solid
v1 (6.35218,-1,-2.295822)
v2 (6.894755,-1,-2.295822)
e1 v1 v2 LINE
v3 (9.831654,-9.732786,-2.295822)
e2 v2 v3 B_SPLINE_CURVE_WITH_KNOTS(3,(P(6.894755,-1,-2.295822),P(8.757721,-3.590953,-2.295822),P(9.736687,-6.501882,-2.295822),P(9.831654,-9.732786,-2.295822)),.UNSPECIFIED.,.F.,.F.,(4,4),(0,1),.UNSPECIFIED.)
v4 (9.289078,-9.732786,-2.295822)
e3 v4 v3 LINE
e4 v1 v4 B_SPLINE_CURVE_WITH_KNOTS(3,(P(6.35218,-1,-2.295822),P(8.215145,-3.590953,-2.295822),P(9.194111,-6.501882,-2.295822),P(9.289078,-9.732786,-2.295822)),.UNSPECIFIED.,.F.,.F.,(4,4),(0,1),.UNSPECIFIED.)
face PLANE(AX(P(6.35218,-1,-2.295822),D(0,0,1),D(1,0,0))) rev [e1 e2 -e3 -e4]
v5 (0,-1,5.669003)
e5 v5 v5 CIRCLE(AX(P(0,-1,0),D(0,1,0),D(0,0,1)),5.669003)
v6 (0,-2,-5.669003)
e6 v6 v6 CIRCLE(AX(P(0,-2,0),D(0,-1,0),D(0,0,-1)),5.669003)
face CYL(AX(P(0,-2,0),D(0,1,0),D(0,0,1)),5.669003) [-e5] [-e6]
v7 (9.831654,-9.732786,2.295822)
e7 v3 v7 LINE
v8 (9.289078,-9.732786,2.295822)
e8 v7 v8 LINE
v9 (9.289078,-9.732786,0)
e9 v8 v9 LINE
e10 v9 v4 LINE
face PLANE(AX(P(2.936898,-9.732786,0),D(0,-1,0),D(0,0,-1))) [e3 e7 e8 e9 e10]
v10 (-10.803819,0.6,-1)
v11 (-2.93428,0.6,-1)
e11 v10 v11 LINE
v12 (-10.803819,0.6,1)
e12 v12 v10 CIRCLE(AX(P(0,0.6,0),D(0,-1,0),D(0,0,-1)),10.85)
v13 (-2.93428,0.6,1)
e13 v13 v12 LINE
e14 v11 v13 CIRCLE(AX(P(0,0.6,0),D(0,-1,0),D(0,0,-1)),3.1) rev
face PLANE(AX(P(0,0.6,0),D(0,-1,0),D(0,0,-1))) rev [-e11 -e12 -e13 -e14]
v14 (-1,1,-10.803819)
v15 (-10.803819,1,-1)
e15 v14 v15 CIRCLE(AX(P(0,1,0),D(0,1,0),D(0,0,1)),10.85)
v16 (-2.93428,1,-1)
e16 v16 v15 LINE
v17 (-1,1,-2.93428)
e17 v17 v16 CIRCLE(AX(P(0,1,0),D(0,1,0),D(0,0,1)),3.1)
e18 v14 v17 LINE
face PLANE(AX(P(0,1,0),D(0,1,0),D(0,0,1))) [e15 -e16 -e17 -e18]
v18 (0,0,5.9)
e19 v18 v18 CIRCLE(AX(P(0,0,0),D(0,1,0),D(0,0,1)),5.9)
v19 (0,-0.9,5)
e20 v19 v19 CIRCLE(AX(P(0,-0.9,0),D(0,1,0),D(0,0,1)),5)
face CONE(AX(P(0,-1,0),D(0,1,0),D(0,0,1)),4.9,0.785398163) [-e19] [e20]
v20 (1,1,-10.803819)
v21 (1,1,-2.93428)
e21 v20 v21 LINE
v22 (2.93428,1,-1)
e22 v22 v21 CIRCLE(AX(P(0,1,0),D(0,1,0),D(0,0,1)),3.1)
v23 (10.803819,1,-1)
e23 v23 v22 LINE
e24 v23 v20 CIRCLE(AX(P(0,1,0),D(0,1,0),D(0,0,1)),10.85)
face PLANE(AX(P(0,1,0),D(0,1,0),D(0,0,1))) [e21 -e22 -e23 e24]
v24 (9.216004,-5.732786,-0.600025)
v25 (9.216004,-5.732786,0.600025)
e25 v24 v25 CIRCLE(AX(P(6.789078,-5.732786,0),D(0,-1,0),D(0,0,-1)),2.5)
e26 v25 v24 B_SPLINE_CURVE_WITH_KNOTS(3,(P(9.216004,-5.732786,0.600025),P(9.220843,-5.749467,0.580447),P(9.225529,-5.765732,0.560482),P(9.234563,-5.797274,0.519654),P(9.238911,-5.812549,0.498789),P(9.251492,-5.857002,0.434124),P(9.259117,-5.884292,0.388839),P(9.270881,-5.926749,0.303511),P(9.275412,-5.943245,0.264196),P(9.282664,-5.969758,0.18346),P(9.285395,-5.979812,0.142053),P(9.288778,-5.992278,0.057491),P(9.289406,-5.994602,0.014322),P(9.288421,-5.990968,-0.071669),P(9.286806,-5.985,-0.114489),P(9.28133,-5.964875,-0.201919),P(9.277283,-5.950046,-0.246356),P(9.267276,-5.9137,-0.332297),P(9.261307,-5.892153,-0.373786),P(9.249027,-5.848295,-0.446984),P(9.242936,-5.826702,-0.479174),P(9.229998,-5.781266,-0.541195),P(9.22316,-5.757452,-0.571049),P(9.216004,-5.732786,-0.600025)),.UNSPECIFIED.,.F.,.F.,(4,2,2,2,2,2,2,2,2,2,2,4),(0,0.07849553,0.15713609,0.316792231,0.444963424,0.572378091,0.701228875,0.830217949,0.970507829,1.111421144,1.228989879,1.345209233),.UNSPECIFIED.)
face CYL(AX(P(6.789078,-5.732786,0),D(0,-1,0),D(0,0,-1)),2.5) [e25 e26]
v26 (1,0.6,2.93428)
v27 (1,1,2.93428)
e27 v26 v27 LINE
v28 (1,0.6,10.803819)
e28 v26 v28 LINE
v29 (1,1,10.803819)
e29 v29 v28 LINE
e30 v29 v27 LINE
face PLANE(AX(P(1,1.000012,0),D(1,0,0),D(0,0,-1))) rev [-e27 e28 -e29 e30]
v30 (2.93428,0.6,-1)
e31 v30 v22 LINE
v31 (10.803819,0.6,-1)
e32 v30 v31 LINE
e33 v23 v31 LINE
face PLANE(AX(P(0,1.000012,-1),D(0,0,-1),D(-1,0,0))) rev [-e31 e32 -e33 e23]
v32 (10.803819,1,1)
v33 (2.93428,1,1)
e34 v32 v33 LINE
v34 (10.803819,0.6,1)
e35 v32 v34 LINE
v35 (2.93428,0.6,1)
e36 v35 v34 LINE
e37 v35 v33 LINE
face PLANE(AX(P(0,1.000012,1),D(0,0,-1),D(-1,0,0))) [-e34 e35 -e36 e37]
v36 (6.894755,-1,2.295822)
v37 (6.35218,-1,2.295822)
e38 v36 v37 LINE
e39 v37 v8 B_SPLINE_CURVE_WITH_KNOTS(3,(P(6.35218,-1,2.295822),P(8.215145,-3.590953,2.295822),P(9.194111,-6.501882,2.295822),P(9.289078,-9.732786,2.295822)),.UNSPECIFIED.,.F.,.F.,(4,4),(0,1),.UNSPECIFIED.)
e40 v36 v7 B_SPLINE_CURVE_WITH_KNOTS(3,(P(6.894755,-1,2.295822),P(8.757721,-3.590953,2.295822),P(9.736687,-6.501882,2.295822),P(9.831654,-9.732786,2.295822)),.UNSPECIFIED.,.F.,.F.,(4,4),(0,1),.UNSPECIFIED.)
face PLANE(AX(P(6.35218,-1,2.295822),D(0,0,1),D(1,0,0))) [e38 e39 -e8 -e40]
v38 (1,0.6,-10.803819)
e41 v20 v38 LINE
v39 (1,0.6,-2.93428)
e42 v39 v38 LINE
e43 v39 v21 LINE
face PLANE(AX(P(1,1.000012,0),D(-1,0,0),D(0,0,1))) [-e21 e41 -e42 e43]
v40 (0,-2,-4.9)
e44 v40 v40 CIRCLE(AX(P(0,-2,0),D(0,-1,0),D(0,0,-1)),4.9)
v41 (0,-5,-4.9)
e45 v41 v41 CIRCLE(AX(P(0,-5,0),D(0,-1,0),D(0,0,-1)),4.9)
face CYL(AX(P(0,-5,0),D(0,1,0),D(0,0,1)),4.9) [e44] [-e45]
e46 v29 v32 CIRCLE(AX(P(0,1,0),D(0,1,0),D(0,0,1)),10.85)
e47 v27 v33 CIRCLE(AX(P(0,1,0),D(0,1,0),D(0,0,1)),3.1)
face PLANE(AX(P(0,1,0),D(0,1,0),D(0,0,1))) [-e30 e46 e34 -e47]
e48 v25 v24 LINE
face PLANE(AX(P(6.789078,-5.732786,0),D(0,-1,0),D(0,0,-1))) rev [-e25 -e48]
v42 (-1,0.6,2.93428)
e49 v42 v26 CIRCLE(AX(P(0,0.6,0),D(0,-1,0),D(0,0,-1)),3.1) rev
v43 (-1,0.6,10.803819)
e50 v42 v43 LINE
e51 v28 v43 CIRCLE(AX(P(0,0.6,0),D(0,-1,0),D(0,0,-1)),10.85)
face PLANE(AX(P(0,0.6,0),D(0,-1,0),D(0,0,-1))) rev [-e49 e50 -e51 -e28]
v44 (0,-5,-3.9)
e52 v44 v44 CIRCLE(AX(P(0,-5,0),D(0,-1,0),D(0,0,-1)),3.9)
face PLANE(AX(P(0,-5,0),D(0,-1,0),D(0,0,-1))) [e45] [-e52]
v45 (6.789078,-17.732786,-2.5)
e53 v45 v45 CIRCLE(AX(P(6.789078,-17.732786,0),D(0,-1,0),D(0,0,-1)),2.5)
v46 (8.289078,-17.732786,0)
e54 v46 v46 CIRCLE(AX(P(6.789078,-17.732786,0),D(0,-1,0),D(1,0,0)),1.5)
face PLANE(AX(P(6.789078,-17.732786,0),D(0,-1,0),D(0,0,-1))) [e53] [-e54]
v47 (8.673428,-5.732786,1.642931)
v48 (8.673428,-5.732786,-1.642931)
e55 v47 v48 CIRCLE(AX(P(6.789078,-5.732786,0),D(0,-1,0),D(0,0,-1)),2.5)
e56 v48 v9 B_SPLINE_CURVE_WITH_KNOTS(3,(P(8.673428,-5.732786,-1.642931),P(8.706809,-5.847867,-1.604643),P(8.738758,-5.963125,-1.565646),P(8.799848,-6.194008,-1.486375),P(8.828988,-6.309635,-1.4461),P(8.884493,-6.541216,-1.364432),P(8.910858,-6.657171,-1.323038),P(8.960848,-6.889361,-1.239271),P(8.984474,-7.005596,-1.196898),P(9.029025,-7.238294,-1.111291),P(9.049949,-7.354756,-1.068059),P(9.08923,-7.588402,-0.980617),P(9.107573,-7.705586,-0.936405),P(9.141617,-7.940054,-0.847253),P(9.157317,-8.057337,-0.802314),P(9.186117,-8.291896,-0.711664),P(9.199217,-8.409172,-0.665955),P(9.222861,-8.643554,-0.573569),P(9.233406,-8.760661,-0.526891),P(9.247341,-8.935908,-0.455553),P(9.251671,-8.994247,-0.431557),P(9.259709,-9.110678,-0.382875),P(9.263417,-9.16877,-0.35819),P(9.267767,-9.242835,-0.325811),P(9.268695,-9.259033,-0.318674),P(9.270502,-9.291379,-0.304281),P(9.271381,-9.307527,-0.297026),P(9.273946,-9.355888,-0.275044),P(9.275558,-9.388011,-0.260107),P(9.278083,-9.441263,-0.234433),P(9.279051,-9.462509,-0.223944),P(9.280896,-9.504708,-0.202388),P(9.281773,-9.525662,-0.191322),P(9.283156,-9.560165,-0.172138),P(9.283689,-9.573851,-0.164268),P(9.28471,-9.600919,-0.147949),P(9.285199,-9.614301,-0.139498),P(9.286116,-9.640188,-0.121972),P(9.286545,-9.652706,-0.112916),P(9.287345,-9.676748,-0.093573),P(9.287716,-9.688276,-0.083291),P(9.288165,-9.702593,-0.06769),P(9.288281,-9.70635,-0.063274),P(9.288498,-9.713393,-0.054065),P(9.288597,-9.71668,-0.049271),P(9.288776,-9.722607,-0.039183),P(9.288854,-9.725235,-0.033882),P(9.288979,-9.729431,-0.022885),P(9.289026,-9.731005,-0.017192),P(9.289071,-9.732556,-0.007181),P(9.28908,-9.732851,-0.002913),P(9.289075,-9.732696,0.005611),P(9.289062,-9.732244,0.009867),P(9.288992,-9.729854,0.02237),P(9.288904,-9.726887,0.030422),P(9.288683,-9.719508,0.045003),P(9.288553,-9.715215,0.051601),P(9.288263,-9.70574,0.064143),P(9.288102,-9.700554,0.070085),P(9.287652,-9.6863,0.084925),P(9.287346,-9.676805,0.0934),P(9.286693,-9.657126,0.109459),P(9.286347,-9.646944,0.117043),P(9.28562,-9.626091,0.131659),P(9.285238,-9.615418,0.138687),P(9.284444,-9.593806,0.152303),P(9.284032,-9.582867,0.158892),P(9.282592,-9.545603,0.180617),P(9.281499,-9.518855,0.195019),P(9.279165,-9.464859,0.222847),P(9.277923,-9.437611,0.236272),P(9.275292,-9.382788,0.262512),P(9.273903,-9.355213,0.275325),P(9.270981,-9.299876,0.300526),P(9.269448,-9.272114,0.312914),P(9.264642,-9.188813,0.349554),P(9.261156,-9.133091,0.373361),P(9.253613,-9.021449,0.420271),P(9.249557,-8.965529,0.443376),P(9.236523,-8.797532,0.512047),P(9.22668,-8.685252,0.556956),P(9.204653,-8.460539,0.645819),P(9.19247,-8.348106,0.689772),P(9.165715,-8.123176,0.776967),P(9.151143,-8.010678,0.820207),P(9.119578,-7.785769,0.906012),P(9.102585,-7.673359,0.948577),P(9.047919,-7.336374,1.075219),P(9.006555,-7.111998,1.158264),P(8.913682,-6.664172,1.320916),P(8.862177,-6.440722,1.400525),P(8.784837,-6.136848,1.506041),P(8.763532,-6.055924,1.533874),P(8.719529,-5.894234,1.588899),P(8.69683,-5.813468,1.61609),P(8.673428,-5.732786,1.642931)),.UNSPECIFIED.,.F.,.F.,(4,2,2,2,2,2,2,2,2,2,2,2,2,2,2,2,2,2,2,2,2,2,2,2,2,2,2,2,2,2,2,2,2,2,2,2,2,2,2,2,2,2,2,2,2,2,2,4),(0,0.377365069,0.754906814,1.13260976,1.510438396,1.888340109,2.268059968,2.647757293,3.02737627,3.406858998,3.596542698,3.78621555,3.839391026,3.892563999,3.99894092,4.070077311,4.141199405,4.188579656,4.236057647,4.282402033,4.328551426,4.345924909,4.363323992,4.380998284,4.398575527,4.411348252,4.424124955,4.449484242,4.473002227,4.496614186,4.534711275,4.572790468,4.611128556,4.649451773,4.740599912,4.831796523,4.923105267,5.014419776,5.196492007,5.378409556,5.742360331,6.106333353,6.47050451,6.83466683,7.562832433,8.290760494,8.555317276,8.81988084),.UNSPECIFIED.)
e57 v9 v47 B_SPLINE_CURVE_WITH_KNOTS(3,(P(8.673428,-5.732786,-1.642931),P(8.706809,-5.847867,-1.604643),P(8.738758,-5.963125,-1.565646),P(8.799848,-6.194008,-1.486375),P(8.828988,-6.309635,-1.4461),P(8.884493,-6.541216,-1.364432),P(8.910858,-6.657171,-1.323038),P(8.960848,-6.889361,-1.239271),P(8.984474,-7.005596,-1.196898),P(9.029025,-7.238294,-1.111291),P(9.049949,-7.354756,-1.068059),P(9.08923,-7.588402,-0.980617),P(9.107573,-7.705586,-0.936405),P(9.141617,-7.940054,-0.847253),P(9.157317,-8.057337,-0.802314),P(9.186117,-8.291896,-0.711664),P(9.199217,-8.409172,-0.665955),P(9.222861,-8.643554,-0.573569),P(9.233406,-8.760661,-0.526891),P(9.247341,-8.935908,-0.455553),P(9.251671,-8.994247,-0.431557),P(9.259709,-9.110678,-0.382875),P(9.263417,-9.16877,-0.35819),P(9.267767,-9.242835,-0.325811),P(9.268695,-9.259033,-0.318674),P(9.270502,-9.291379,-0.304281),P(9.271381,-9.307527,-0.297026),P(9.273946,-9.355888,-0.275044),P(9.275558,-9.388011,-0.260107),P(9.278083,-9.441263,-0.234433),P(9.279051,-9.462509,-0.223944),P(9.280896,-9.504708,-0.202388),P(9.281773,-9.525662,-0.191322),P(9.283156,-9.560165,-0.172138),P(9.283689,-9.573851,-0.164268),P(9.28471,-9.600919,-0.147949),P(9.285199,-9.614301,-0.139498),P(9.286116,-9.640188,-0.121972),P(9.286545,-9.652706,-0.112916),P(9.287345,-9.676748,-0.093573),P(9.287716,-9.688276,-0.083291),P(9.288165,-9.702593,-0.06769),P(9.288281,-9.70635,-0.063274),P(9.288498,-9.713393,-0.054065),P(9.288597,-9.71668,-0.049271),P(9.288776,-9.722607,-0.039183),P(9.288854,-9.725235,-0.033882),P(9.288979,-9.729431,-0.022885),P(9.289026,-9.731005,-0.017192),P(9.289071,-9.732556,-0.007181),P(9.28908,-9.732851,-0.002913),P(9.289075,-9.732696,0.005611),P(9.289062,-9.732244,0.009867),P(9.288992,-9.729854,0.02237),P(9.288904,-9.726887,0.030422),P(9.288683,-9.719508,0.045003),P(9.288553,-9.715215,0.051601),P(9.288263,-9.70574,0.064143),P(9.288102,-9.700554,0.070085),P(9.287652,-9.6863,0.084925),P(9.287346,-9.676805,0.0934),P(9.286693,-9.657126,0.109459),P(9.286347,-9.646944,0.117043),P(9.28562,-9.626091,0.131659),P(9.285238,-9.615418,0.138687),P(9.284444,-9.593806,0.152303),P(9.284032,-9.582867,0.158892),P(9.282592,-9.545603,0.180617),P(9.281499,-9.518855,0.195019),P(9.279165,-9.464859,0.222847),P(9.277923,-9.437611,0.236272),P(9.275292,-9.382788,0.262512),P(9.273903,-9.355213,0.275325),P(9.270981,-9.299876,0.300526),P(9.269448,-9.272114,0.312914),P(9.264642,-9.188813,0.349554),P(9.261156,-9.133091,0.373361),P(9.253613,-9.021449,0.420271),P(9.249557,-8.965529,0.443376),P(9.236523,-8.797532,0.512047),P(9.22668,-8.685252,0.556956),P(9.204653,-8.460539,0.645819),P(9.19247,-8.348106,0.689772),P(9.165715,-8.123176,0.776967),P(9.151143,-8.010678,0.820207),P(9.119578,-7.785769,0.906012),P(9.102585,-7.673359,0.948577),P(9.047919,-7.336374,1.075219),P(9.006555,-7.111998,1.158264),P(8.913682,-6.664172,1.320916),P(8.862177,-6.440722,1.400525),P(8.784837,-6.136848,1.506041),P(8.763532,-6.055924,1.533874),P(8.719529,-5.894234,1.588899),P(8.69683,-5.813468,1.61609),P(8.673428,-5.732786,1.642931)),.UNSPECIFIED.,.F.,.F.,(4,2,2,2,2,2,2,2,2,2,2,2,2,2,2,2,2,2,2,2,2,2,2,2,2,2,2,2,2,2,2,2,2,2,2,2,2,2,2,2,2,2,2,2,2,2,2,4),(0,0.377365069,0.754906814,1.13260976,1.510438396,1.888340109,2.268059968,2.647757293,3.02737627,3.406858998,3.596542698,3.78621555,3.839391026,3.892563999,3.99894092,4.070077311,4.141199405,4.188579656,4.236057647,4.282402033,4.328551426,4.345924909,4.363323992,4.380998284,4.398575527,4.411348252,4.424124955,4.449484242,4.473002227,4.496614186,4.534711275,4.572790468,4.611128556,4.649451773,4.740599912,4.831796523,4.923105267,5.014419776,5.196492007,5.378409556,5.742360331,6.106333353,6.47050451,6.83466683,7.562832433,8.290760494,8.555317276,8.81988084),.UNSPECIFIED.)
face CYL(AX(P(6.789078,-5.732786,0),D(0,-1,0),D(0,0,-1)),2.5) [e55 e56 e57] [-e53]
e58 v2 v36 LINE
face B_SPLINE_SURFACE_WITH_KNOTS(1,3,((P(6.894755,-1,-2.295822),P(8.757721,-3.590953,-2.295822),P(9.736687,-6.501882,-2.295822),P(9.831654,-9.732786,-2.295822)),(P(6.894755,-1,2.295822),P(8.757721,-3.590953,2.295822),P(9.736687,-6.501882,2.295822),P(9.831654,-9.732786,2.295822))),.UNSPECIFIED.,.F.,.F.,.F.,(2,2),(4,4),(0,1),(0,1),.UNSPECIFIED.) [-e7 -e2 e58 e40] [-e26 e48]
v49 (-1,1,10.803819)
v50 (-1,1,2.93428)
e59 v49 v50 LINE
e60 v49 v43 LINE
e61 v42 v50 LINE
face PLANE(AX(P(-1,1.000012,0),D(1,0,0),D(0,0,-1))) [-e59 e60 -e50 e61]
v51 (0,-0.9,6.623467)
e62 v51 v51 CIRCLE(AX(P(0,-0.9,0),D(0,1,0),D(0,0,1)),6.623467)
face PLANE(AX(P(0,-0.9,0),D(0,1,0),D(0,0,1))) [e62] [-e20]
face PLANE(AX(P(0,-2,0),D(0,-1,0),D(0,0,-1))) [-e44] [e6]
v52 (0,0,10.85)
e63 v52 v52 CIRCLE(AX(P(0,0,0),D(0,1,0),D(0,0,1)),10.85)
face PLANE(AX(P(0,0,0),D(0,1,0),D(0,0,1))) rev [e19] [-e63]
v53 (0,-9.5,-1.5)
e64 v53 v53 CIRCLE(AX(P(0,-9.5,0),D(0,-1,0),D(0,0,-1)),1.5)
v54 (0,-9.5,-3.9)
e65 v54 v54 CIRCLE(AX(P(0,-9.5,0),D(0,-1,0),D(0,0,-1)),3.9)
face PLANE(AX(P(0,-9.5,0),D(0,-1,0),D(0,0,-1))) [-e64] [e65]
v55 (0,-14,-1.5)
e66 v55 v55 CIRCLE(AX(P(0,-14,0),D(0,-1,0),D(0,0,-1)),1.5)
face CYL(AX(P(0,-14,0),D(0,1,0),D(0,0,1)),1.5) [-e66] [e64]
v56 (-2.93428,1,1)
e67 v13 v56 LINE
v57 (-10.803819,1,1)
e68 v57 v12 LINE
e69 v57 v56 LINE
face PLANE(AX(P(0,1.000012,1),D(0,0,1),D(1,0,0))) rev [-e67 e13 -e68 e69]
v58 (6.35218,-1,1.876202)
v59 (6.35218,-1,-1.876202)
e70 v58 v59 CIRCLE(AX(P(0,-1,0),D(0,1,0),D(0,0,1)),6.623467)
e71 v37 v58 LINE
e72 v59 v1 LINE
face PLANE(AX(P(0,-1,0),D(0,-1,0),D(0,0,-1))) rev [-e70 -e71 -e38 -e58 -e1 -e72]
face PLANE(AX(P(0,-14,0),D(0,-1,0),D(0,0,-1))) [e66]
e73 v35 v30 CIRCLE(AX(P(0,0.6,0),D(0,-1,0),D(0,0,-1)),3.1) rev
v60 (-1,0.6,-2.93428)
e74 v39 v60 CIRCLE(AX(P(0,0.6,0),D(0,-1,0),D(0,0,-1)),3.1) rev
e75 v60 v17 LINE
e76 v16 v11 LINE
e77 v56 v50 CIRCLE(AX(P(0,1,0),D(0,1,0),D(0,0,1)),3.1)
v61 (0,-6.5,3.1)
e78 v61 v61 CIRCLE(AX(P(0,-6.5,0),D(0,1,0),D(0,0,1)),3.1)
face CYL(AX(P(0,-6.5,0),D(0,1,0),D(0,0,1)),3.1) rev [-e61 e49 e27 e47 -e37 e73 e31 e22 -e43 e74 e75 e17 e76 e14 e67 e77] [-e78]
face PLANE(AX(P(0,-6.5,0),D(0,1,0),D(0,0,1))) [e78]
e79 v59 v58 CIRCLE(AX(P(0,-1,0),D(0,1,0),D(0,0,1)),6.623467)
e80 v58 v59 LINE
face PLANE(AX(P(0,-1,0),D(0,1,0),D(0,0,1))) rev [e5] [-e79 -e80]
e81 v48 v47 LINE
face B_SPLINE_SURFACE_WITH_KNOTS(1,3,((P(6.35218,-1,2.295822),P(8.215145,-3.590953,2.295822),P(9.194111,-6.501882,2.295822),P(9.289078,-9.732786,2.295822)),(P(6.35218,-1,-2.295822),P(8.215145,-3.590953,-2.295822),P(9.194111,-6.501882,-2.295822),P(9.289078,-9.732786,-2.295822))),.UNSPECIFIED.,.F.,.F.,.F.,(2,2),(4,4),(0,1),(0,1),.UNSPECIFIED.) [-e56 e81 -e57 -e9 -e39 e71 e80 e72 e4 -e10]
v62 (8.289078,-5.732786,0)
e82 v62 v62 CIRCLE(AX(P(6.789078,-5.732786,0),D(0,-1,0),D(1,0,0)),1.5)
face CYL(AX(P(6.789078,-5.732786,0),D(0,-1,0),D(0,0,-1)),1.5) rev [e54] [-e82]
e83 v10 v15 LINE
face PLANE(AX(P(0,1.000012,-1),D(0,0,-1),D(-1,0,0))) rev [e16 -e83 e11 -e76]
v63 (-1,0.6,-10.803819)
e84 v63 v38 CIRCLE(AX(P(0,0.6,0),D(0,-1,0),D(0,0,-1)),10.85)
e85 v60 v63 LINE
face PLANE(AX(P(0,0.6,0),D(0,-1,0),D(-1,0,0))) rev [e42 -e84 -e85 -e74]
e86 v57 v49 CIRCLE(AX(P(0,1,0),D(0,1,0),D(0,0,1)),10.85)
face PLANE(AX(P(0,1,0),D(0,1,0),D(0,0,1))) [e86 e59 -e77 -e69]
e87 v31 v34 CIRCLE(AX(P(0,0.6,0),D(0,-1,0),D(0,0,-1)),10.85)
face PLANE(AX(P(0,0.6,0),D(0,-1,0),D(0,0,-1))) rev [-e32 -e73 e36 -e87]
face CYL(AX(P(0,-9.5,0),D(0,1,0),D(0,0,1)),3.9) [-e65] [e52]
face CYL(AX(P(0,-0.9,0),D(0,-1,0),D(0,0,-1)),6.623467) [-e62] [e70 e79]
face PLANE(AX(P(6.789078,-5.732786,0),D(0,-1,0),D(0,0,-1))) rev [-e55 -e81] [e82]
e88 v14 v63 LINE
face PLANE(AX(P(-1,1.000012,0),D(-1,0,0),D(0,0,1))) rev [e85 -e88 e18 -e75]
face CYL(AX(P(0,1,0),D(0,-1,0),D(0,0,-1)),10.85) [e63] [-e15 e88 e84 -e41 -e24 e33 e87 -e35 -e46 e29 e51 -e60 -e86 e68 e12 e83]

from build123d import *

# Parameters (mm, degrees)
SKETCH1_R                = 10.85
BOSS_EXTRUDE1_DEPTH      = 1
SKETCH2_R                = 4.9
BOSS_EXTRUDE2_DEPTH      = 5
SKETCH3_R                = 3.9
BOSS_EXTRUDE3_DEPTH      = 4.5
SKETCH4_R                = 1.5
BOSS_EXTRUDE4_DEPTH      = 4.5
CHAMFER1_SIZE            = 1
SKETCH5_R                = 3.1
CUT_EXTRUDE1_DEPTH       = 7.5
CUT_EXTRUDE_THIN2_START  = -0.4
SKETCH6_W                = 2
SKETCH6_H                = 21.149646587
CUT_EXTRUDE_THIN2_DEPTH  = 22.857982198
CIRPATTERN1_COUNT        = 4
SKETCH8_R                = 5.669003214
SKETCH8_R_2              = 4.883775851
BOSS_EXTRUDE5_DEPTH      = 1
SKETCH10_R               = 6.62346743
SKETCH10_R_2             = 4.788629078
BOSS_EXTRUDE6_DEPTH      = 0.1
SWEEP1_START             = -2.295822316
SWEEP1_DEPTH             = 4.591644632
EXTRUDE_THIN1_DEPTH      = 8
EXTRUDE_THIN1_DEPTH_BACK = 4
SKETCH13_R               = 2.5
SKETCH13_R_2             = 1.5


# Read off the part's stored shape, not the designer's step: Sweep1
with BuildPart() as part:
    # Sketch1 → Boss-Extrude1 (new body)
    with BuildSketch(Plane(origin=(0, 0, 0), x_dir=(1, 0, 0), z_dir=(0, 1, 0))):
        with Locations(Location((0, 0, 0), (0, 0, 270))):
            Circle(SKETCH1_R)
    extrude(amount=BOSS_EXTRUDE1_DEPTH)

    # Sketch2 → Boss-Extrude2 (add)
    with BuildSketch(Plane.XZ):
        with Locations(Location((0, 0, 0), (0, 0, 270))):
            Circle(SKETCH2_R)
    extrude(amount=BOSS_EXTRUDE2_DEPTH)

    # Sketch3 → Boss-Extrude3 (add)
    with BuildSketch(Plane.XZ.offset(5)):
        with Locations(Location((0, 0, 0), (0, 0, 270))):
            Circle(SKETCH3_R)
    extrude(amount=BOSS_EXTRUDE3_DEPTH)

    # Sketch4 → Boss-Extrude4 (add)
    with BuildSketch(Plane.XZ.offset(9.5)):
        with Locations(Location((0, 0, 0), (0, 0, 270))):
            Circle(SKETCH4_R)
    extrude(amount=BOSS_EXTRUDE4_DEPTH)

    # Chamfer1
    chamfer1_edges = [part.edges().sort_by_distance(p)[0] for p in [
        (0, 0, 4.9),
    ]]
    chamfer(chamfer1_edges, length=CHAMFER1_SIZE)

    # Sketch5 → Cut-Extrude1 (cut)
    with BuildSketch(Plane(origin=(0, 1, 0), x_dir=(1, 0, 0), z_dir=(0, 1, 0))):
        with Locations(Location((0, 0, 0), (0, 0, 270))):
            Circle(SKETCH5_R)
    extrude(amount=-CUT_EXTRUDE1_DEPTH, mode=Mode.SUBTRACT)

    # Sketch6 → Cut-Extrude-Thin2 (cut)
    with BuildSketch(Plane(origin=(0, 1, 0), x_dir=(1, 0, 0), z_dir=(0, 1, 0)).offset(CUT_EXTRUDE_THIN2_START)):
        with Locations((0, 10.574823294)):
            Rectangle(SKETCH6_W, SKETCH6_H)
    cut_extrude_thin2 = extrude(amount=CUT_EXTRUDE_THIN2_DEPTH, mode=Mode.SUBTRACT)

    # CirPattern1: Cut-Extrude-Thin2 ×4 about axis
    cirpattern1_axis = Axis((0, 0, 0), (0, 1, 0))
    for i in range(1, CIRPATTERN1_COUNT):
        add(cut_extrude_thin2.rotate(cirpattern1_axis, i * 360 / CIRPATTERN1_COUNT), mode=Mode.SUBTRACT)

    # Sketch8 → Boss-Extrude5 (add)
    with BuildSketch(Plane(origin=(0, -1, 0), x_dir=(-1, 0, 0), z_dir=(0, -1, 0))):
        with Locations(Location((0, 0, 0), (0, 0, 90))):
            Circle(SKETCH8_R)
        Circle(SKETCH8_R_2, mode=Mode.SUBTRACT)
    extrude(amount=BOSS_EXTRUDE5_DEPTH)



with BuildPart() as body_2:
    # Sketch10 → Boss-Extrude6 (new body)
    with BuildSketch(Plane(origin=(0, -1, 0), x_dir=(1, 0, 0), z_dir=(0, 1, 0))):
        with Locations(Location((0, 0, 0), (0, 0, 270))):
            Circle(SKETCH10_R)
        with Locations(Location((0, 0, 0), (0, 0, 270))):
            Circle(SKETCH10_R_2, mode=Mode.SUBTRACT)
    extrude(amount=BOSS_EXTRUDE6_DEPTH)

    # Sweep1 outline → Sweep1 (add)
    with BuildSketch(Plane.XY.offset(SWEEP1_START)):
        with BuildLine():
            Line((6.894755274, -1), (6.352179586, -1))
            add(Edge.make_bspline(
                [(6.352179586, -1), (8.215144945, -3.590953031), (9.19411107, -6.50188171), (9.289077959, -9.732786039)],
                knots=[0, 0, 0, 0, 1, 1, 1, 1], degree=3))
            Line((9.289077959, -9.732786039), (9.831653647, -9.732786039))
            add(Edge.make_bspline(
                [(6.894755274, -1), (8.757720633, -3.590953031), (9.736686757, -6.50188171), (9.831653647, -9.732786039)],
                knots=[0, 0, 0, 0, 1, 1, 1, 1], degree=3))
        make_face()
    extrude(amount=SWEEP1_DEPTH)


with BuildPart() as part_1:
    add(part.part)

    add(body_2.part)  # Extrude-Thin1 merges body 2
    # Sketch13 → Extrude-Thin1 (add, two sides: drawn at the far end of the back side and taken through both)
    with BuildSketch(Plane.XZ.offset(9.732786039).offset(-EXTRUDE_THIN1_DEPTH_BACK)):
        with Locations((6.789077959, 0)):
            Circle(SKETCH13_R)
        with Locations((6.789077959, 0)):
            Circle(SKETCH13_R_2, mode=Mode.SUBTRACT)
    extrude(amount=EXTRUDE_THIN1_DEPTH + EXTRUDE_THIN1_DEPTH_BACK)


solid = part_1.part
